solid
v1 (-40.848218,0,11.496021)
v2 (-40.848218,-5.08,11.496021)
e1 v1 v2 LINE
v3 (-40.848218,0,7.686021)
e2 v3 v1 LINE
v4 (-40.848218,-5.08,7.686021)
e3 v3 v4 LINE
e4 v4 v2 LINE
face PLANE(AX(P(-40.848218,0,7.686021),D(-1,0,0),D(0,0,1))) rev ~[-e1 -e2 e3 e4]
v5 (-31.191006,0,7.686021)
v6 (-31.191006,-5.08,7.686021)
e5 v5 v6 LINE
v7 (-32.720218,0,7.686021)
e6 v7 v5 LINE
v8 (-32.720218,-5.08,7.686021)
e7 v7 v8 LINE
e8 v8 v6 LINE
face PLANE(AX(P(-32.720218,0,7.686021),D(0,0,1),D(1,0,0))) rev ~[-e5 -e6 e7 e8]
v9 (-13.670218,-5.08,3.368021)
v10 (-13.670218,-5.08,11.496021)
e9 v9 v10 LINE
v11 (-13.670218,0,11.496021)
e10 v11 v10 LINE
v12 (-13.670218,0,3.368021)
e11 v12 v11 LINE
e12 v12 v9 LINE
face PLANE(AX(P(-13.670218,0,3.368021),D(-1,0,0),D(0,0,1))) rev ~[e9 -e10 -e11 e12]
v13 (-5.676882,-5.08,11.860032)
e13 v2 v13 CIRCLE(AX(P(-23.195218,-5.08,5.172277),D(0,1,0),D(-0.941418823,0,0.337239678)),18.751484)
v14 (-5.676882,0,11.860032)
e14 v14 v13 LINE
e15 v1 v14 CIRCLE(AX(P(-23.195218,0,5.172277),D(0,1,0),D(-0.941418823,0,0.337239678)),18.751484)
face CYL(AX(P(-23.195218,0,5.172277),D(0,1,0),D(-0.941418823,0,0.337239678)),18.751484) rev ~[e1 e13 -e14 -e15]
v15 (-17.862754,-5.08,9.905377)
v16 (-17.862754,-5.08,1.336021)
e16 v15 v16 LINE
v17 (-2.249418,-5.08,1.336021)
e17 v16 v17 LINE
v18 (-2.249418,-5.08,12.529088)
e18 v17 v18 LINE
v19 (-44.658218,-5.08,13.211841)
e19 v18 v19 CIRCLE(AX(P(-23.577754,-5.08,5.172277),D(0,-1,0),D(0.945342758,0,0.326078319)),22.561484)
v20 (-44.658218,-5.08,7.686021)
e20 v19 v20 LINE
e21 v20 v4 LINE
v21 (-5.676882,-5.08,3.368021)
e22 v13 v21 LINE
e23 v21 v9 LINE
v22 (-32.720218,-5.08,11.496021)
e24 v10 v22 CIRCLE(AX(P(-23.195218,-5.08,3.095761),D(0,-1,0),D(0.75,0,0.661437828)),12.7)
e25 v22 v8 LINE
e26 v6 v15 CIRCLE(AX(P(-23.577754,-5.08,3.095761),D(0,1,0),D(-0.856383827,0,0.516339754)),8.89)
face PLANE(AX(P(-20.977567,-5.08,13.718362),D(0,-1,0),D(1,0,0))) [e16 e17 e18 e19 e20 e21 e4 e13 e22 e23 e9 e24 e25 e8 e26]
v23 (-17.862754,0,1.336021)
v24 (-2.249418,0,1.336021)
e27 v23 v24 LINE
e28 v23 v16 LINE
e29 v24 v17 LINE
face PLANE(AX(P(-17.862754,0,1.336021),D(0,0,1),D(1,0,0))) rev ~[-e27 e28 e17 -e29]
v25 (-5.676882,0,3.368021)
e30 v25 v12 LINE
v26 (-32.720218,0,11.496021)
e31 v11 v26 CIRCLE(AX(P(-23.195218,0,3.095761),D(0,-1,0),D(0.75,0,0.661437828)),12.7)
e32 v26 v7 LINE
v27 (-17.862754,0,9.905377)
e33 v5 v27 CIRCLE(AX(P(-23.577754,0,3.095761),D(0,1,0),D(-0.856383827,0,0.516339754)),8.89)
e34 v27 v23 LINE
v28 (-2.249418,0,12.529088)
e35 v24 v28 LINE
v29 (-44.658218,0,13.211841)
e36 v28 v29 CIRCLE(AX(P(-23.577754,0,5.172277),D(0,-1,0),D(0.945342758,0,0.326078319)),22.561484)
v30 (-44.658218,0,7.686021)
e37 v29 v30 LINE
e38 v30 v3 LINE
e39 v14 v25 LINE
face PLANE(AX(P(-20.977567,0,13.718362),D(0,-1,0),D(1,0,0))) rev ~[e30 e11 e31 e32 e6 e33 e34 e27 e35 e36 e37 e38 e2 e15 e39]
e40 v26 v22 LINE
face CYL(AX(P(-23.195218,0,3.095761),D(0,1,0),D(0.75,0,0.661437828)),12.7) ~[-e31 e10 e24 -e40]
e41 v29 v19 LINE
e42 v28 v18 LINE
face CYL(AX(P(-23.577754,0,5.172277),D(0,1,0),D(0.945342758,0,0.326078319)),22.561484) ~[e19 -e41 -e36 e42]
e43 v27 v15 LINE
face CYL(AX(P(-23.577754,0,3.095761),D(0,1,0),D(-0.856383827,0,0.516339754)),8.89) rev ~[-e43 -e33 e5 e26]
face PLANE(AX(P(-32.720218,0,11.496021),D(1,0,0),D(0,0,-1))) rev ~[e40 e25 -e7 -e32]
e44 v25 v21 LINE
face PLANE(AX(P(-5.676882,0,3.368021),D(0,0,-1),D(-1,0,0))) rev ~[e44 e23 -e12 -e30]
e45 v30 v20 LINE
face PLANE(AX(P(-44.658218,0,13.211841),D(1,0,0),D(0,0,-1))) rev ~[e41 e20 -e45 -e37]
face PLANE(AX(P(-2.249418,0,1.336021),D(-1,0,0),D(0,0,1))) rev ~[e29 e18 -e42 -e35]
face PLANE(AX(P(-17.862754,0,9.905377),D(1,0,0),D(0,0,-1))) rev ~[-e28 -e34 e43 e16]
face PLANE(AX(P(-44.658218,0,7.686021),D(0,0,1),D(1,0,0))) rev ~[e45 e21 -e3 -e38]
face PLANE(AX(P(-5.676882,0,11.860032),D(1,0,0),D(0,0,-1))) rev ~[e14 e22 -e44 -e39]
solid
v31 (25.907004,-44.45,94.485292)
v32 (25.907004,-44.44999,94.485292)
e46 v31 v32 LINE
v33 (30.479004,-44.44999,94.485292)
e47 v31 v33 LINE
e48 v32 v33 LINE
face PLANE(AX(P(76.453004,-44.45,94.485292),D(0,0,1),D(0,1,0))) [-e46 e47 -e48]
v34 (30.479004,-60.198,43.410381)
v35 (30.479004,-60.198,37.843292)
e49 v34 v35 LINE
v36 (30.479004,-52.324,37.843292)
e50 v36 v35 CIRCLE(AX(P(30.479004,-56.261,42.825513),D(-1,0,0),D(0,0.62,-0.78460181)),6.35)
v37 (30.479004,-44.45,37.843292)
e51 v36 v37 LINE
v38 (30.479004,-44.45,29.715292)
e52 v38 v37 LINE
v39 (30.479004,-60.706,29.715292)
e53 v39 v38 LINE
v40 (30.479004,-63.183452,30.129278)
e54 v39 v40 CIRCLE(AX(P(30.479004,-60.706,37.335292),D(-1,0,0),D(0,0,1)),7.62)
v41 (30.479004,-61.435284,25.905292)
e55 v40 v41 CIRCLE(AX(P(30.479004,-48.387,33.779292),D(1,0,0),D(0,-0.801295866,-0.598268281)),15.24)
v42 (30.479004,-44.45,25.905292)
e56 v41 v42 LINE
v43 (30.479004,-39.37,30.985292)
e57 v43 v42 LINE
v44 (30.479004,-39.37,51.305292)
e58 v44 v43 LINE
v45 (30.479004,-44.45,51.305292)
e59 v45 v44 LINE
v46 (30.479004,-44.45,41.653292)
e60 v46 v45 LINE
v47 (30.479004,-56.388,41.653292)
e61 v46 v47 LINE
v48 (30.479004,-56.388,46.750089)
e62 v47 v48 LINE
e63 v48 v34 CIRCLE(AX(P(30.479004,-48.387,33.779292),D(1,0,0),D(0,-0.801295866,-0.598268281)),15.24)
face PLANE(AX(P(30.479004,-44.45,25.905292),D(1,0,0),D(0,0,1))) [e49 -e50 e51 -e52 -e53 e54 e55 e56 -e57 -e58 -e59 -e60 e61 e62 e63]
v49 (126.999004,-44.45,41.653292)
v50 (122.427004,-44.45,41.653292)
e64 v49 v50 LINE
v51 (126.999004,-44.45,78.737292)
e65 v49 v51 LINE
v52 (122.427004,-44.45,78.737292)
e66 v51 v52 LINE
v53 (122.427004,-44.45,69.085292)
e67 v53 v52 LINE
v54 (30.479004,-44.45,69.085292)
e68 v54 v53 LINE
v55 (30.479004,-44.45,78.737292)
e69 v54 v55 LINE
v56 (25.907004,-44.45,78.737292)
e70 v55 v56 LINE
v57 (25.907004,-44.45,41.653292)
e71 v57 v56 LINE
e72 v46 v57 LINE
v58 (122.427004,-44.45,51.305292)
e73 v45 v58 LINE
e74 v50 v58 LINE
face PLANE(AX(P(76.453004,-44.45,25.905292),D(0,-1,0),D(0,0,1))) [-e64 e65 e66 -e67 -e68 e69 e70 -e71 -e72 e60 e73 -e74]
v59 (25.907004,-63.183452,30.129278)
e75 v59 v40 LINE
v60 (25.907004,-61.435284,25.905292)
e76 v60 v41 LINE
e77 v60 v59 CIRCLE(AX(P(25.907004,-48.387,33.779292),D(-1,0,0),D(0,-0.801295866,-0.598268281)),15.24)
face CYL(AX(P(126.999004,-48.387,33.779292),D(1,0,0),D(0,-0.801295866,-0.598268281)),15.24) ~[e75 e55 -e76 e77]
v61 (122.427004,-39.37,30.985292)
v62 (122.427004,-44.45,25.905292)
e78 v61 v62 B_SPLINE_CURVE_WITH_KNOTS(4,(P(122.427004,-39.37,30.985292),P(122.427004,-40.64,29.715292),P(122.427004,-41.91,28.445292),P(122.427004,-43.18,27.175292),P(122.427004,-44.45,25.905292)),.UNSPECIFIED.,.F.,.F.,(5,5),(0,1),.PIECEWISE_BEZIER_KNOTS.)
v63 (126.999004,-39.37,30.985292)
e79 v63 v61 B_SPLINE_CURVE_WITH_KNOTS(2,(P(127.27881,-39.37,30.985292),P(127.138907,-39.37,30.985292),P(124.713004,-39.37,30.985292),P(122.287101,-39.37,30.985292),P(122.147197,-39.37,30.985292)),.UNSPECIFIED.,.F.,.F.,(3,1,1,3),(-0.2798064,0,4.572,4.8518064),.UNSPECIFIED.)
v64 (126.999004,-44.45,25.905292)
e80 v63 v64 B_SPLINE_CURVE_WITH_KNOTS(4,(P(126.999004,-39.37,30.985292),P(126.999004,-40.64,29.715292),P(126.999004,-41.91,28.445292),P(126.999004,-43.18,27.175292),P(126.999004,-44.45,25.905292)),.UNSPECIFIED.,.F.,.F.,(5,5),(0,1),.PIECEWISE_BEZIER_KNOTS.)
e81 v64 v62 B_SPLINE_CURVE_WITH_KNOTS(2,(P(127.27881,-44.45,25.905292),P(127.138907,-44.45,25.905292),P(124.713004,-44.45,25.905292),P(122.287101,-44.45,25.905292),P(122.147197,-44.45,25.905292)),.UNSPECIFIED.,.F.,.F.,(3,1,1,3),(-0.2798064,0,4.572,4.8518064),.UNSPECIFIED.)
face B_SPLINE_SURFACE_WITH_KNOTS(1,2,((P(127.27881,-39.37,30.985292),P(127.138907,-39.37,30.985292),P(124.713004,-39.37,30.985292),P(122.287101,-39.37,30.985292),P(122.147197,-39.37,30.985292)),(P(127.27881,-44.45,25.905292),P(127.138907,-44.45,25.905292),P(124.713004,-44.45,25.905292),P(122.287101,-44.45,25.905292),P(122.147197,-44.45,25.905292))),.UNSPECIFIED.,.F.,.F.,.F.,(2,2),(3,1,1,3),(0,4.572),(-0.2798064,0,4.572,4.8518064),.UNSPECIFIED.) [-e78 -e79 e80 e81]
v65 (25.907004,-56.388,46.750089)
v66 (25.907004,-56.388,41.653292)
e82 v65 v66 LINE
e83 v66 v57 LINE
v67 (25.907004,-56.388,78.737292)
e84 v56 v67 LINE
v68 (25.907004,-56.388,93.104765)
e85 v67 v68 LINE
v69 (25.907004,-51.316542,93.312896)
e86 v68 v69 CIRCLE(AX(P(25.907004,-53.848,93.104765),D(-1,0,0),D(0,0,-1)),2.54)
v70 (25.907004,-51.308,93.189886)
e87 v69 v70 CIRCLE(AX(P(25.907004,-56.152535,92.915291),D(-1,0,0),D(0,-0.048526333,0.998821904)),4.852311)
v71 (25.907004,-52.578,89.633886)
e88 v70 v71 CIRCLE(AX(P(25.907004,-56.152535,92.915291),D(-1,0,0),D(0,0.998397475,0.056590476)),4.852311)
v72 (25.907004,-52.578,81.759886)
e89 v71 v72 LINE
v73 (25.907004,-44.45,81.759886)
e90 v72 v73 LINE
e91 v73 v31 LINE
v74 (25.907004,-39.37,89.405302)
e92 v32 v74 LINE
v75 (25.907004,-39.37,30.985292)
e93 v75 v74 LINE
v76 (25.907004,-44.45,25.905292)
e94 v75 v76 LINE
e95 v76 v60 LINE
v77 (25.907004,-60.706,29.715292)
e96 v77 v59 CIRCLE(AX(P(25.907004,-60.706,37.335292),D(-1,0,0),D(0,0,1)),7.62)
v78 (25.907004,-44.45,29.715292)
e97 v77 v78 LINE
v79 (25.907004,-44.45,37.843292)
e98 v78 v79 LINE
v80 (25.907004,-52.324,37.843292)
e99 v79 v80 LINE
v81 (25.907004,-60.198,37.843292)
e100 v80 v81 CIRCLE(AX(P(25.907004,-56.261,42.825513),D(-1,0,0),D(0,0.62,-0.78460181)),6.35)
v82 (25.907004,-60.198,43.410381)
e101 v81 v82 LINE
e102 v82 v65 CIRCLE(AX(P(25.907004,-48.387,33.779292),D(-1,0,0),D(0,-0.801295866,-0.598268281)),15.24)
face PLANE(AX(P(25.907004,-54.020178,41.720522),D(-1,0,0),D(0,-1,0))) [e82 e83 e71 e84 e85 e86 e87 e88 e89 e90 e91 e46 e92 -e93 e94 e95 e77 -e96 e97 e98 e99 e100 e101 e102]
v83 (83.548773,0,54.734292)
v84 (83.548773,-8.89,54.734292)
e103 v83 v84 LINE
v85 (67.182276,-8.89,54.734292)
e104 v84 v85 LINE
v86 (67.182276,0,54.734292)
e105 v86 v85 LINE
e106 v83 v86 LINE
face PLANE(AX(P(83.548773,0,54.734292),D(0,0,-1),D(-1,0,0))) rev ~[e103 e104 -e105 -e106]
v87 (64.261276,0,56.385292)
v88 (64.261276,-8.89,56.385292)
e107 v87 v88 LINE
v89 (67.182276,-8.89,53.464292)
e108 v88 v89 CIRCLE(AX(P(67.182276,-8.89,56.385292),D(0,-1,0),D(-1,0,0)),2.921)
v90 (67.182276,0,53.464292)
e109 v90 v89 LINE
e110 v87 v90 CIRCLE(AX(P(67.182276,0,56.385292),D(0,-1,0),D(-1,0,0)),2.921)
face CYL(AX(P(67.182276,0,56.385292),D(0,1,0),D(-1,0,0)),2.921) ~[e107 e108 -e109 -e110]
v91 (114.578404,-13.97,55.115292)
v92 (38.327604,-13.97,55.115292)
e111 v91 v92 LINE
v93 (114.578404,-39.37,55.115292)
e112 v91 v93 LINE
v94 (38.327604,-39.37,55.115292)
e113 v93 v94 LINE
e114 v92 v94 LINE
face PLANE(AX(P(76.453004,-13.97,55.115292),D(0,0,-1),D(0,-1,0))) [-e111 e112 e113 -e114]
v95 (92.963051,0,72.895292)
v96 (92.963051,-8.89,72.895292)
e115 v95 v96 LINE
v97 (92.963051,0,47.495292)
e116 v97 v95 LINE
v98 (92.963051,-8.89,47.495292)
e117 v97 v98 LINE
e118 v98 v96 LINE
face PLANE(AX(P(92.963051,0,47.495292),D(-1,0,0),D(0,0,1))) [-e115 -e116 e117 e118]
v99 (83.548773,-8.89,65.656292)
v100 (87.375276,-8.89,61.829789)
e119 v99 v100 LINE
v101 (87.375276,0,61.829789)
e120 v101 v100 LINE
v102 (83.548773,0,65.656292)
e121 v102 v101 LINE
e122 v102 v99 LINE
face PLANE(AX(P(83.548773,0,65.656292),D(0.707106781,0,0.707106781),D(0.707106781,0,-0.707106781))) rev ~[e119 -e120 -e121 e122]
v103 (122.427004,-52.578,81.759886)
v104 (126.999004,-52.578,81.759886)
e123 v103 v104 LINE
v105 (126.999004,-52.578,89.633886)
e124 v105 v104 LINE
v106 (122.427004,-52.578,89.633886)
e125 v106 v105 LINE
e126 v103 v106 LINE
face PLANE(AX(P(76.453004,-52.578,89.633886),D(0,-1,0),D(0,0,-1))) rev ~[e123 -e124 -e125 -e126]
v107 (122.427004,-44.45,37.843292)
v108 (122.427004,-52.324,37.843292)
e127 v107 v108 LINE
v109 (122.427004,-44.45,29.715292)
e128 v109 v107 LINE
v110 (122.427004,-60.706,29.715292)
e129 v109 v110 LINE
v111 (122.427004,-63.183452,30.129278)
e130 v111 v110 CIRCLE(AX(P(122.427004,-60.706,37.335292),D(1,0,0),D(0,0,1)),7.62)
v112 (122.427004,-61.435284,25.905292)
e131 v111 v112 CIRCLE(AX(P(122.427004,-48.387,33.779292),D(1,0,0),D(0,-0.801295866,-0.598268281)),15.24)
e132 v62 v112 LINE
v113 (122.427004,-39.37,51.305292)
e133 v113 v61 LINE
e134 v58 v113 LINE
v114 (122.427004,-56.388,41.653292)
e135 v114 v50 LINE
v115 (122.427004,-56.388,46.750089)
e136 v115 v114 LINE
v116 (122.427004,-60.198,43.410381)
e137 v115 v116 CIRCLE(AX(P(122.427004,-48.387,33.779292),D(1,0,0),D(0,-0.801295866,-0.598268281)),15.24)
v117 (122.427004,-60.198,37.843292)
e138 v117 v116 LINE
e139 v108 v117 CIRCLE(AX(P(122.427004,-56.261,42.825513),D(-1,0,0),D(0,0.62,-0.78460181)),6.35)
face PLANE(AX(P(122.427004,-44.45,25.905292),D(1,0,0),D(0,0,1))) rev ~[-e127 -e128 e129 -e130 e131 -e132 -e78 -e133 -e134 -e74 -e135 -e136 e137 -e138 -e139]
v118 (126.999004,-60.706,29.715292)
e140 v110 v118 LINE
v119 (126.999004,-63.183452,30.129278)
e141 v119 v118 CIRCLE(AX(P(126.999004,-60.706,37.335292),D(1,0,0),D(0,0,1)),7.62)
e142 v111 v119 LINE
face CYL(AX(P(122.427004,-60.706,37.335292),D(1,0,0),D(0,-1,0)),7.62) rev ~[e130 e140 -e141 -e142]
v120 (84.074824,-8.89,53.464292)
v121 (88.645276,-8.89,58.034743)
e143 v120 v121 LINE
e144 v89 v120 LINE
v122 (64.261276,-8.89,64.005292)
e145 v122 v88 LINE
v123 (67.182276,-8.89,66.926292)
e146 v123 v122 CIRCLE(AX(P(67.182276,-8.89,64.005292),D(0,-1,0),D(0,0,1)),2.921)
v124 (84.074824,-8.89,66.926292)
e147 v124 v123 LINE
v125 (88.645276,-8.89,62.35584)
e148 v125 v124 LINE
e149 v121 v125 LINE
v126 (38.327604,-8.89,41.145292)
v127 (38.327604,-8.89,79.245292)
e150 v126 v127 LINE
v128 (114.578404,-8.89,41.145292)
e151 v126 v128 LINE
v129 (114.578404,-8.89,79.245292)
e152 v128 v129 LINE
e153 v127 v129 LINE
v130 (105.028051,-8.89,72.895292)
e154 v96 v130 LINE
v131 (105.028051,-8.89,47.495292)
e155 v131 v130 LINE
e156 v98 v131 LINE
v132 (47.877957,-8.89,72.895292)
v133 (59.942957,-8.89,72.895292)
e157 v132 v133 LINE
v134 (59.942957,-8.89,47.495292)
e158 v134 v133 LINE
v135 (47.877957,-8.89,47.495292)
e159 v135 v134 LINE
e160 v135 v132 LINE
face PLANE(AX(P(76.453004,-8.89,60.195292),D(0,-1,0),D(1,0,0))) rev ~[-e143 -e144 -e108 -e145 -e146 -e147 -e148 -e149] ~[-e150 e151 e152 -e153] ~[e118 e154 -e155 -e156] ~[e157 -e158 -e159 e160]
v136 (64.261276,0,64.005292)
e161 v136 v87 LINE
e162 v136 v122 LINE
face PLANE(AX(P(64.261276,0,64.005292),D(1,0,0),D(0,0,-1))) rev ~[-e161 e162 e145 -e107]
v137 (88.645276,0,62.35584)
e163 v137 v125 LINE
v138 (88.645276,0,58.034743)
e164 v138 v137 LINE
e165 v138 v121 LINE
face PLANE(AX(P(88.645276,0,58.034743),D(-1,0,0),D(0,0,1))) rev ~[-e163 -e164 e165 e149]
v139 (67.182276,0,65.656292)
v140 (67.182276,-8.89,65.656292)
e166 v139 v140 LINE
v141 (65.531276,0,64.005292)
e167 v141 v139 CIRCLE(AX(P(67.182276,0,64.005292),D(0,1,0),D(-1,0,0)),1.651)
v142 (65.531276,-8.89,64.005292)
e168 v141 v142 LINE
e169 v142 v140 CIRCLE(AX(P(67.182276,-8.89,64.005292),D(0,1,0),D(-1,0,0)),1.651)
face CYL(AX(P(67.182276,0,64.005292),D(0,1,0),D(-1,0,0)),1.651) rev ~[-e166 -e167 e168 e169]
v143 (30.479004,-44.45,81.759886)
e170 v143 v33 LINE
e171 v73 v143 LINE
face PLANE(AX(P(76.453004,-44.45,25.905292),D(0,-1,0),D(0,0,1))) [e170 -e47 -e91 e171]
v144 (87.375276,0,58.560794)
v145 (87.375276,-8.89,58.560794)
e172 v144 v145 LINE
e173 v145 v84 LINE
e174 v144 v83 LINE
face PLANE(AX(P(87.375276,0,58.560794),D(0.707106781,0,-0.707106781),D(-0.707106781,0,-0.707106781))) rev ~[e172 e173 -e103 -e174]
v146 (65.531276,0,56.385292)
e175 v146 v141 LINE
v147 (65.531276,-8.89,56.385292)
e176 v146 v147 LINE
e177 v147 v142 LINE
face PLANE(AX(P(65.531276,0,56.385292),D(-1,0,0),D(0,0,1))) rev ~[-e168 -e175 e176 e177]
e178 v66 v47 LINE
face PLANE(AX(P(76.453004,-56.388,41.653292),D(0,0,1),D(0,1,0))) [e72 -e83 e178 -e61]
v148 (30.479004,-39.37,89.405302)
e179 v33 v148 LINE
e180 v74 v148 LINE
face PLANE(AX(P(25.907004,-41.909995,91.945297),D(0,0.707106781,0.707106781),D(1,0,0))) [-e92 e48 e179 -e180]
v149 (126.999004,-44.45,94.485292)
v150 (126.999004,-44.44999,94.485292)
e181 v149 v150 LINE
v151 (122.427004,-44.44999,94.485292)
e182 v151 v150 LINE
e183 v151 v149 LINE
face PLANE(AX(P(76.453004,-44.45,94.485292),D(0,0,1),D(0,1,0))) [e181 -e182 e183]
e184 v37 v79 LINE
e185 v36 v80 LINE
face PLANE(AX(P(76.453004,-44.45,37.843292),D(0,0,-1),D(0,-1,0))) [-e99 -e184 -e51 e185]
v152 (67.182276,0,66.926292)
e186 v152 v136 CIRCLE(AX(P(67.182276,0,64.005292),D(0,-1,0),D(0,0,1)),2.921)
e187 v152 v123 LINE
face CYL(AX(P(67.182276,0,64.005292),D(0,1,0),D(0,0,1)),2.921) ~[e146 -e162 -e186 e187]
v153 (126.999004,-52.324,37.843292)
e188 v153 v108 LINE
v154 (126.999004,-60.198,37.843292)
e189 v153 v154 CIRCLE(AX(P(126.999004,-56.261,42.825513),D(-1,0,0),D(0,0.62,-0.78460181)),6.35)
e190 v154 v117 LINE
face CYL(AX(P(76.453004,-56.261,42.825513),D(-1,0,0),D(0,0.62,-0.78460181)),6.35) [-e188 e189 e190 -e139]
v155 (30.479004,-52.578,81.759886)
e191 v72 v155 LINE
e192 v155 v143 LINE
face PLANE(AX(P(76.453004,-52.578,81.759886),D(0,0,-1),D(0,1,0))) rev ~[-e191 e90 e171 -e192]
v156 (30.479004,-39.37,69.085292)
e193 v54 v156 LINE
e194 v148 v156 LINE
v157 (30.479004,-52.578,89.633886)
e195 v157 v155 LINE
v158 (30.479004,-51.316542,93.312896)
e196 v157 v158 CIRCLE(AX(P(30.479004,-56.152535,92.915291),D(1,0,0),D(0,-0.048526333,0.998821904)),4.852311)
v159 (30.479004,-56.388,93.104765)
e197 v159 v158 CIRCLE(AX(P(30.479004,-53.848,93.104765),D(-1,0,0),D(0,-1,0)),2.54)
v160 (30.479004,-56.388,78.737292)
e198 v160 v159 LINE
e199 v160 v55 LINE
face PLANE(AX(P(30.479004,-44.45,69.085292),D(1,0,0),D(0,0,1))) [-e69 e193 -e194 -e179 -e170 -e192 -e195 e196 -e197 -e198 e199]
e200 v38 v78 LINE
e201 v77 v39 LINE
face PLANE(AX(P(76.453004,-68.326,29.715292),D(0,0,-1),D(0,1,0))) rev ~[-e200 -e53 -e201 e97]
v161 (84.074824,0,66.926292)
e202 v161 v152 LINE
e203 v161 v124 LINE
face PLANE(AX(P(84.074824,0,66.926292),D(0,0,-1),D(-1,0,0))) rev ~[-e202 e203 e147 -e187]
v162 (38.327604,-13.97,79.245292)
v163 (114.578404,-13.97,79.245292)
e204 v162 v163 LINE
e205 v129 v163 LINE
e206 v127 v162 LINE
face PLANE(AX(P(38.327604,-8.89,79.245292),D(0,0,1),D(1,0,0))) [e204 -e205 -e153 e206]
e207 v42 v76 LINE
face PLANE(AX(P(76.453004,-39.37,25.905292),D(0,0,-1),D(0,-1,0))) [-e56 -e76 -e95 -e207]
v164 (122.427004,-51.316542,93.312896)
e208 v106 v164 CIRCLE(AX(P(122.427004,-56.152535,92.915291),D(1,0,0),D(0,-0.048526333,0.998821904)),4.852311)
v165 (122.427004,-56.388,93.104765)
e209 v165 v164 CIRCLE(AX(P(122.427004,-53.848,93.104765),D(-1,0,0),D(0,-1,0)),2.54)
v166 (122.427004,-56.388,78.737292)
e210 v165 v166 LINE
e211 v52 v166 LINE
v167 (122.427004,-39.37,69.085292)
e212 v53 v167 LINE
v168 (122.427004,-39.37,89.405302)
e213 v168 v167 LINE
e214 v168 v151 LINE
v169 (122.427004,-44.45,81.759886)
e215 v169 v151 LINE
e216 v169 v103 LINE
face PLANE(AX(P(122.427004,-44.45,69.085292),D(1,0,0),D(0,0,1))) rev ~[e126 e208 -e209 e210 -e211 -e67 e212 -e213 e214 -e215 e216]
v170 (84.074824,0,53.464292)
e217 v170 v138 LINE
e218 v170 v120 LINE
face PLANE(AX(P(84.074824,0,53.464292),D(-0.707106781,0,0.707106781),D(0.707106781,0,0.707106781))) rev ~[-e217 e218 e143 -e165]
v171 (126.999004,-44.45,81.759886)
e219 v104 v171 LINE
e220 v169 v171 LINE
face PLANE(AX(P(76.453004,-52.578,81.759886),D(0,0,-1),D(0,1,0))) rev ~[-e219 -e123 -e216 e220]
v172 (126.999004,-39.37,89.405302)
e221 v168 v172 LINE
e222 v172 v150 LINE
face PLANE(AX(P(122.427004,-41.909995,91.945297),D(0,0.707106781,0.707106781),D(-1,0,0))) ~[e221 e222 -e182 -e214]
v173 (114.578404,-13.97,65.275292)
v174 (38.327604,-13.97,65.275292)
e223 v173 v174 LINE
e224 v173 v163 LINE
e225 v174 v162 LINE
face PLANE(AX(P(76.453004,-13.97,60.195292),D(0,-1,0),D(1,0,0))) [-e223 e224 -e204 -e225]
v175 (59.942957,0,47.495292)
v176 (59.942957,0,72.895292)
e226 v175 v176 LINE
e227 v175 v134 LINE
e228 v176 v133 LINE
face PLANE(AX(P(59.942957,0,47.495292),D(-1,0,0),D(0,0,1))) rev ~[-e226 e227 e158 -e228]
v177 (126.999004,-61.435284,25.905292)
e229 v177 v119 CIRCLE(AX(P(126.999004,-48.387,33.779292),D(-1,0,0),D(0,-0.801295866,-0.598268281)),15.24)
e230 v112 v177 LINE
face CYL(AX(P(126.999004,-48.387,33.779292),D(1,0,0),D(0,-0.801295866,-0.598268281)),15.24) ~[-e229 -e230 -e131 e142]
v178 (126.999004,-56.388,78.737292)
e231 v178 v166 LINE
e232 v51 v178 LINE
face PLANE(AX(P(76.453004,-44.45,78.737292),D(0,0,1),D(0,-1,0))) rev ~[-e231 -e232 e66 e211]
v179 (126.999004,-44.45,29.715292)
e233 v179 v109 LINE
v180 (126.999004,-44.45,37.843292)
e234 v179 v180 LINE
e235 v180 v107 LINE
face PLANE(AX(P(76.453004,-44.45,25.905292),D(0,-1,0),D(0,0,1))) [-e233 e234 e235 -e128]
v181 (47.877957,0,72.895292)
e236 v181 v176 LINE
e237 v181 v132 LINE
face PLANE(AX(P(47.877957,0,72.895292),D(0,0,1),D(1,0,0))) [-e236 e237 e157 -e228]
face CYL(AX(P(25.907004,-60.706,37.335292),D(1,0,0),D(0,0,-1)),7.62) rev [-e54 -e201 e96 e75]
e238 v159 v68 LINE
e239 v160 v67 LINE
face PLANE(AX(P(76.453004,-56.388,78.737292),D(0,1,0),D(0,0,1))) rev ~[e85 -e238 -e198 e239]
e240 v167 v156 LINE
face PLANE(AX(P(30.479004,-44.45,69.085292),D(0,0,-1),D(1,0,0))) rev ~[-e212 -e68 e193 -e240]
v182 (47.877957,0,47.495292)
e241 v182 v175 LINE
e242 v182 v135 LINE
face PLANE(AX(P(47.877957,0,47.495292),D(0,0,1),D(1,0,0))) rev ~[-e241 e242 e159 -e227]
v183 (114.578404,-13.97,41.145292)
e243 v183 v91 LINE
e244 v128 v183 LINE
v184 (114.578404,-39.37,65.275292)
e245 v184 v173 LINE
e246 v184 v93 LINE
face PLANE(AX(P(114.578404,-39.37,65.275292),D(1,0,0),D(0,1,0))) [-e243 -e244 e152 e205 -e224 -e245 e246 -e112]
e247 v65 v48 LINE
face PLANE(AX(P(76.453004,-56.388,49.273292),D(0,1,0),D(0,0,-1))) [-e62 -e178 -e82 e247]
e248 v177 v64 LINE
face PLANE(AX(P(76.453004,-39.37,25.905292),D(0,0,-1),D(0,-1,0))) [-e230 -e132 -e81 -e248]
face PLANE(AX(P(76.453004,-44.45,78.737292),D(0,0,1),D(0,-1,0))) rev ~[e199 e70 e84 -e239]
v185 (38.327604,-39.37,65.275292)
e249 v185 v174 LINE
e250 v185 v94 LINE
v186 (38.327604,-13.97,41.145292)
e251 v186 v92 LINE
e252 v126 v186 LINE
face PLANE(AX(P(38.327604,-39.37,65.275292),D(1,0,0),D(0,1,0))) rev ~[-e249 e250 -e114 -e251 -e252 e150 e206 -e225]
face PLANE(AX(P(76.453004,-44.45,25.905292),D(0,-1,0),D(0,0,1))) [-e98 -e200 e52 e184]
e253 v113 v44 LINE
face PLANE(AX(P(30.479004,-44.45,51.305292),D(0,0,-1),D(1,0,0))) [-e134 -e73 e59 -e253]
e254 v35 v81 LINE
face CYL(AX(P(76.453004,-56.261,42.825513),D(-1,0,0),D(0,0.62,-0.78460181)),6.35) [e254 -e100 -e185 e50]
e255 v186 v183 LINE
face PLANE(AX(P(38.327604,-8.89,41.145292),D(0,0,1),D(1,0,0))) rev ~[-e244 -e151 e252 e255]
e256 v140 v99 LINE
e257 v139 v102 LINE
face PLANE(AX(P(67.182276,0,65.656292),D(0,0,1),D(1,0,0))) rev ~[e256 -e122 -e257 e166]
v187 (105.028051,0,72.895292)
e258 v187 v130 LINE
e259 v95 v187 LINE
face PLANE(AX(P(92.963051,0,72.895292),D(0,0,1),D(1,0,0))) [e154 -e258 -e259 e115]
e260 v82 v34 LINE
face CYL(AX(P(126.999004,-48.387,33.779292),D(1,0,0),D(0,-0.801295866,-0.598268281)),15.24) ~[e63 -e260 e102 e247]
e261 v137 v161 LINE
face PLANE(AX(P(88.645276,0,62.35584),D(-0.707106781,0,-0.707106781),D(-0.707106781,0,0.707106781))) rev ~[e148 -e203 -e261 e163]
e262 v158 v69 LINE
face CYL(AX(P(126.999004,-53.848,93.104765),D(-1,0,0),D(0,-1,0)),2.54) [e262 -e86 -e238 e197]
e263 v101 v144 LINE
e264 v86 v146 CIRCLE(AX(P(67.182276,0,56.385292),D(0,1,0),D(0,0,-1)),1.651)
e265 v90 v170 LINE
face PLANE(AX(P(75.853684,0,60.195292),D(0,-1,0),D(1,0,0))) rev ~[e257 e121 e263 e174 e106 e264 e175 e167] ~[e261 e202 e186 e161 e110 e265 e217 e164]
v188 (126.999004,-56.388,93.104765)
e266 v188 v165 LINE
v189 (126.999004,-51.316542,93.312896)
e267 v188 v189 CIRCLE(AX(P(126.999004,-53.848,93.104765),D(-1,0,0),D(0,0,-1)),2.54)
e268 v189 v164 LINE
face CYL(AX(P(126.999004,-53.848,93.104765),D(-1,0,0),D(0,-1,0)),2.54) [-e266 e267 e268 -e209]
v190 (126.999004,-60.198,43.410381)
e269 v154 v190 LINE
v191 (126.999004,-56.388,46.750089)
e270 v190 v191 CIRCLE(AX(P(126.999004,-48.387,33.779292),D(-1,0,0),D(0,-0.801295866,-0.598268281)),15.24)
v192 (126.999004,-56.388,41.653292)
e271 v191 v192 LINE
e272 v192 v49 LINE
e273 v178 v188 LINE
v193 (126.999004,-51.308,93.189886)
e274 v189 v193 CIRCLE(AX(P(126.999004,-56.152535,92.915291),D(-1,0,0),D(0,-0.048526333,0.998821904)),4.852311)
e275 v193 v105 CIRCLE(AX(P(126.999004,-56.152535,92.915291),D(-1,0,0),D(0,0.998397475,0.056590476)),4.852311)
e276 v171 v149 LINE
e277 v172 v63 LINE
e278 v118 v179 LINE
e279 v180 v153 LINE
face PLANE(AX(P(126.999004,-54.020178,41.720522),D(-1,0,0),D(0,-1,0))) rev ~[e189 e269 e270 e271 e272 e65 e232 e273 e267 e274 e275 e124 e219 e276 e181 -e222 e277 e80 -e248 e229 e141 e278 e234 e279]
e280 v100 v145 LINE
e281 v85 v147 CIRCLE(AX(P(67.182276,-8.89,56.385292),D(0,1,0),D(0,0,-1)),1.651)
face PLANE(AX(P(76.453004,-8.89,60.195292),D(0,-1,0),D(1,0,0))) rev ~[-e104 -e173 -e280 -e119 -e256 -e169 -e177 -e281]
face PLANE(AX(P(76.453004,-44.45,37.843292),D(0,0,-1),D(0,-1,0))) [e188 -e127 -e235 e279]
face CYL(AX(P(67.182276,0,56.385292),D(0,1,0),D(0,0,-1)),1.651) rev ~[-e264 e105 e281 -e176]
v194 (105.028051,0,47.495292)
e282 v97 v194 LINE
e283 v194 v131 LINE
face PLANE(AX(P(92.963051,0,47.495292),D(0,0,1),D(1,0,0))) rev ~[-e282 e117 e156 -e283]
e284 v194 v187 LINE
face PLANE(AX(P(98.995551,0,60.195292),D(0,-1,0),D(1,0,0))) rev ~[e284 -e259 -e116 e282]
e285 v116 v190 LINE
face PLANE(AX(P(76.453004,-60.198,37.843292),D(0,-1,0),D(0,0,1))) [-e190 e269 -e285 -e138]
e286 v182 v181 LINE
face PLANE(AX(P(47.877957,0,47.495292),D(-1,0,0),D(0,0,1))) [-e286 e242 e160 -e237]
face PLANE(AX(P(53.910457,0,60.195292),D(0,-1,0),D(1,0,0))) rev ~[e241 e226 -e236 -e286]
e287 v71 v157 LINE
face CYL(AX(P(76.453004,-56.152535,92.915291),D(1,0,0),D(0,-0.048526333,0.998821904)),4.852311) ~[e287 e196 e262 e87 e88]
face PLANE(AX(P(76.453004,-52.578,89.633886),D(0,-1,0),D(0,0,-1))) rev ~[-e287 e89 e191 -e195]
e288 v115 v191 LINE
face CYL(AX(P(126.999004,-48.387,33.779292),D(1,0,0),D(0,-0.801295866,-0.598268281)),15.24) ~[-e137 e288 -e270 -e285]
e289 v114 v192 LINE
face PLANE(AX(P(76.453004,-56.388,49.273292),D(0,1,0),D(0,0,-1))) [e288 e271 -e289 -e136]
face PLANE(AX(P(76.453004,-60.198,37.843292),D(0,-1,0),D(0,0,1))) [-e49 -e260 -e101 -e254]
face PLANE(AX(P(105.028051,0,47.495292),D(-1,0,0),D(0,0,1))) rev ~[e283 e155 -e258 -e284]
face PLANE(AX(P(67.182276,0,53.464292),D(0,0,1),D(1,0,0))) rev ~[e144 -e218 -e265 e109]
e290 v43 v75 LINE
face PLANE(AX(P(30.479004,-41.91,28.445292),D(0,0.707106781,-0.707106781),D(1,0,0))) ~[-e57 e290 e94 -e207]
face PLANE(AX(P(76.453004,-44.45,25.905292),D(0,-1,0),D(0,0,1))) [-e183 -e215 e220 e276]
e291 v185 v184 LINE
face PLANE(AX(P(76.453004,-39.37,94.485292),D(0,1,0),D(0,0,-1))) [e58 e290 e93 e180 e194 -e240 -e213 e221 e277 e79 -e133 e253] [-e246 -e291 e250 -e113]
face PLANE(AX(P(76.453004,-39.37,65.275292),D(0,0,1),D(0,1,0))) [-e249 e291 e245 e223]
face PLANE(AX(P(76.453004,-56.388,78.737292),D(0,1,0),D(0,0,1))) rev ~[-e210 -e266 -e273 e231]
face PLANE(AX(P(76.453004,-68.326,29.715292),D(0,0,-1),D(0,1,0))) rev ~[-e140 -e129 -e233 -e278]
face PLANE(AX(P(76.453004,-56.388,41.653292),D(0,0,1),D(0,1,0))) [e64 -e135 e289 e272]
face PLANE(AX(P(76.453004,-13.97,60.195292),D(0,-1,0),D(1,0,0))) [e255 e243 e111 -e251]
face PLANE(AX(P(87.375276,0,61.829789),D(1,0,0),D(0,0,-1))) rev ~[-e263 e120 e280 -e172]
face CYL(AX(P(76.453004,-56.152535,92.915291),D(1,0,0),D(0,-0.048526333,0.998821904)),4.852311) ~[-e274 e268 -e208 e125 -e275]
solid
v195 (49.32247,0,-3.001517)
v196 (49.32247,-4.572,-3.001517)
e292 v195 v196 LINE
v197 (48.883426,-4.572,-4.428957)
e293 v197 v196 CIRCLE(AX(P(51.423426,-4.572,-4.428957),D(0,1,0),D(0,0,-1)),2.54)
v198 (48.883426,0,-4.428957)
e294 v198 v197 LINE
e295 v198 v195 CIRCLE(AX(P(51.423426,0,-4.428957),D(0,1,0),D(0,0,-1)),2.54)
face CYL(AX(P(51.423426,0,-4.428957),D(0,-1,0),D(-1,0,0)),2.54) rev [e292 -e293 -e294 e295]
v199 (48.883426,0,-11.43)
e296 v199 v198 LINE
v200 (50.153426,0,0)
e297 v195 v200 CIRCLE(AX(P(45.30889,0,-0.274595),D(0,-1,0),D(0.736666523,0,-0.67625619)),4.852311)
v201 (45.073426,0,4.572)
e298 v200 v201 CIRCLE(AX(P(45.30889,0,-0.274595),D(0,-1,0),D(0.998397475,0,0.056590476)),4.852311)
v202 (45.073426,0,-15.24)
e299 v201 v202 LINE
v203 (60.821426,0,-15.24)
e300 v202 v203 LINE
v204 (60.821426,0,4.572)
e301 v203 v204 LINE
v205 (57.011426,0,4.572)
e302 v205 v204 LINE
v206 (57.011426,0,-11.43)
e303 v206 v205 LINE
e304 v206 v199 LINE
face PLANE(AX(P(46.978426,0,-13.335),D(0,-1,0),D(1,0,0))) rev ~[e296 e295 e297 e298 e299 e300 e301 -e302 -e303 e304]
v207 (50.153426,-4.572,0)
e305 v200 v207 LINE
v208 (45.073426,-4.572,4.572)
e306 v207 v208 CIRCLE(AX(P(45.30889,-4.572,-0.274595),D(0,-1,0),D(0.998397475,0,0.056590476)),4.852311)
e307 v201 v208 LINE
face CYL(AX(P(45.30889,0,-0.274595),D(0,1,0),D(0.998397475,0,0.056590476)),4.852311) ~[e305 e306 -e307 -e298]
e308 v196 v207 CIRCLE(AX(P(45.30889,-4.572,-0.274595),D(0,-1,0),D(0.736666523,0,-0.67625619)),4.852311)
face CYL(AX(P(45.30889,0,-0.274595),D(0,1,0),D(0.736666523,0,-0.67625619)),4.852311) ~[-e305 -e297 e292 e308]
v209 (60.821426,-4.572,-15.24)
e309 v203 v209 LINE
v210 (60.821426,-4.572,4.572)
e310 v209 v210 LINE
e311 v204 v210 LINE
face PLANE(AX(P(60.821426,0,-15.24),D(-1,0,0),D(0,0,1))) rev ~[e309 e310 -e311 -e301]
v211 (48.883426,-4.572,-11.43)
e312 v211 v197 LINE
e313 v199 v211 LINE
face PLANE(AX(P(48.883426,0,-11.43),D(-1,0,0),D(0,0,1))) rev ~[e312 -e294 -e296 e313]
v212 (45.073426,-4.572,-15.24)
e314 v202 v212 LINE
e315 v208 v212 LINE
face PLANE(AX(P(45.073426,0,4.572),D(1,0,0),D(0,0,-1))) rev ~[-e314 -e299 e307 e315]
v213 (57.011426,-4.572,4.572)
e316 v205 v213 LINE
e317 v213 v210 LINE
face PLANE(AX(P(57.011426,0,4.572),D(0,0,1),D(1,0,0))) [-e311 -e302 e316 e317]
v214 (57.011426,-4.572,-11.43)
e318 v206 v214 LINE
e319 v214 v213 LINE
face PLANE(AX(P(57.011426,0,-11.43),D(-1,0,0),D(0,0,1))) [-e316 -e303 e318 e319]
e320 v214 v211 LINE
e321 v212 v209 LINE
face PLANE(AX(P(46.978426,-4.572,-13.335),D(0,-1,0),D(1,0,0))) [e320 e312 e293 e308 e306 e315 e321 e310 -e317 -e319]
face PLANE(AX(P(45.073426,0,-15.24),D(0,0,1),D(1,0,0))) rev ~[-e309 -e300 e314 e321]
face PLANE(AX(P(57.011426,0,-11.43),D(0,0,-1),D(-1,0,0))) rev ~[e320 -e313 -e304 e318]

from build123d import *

# Parameters (mm, degrees)
F1_DEPTH  = 5.08
F2_W      = 3.81
F2_H      = 3.81
F2_H_2    = 16.002
F3_DEPTH  = 4.572
F4_R      = 2.54
F6_DEPTH  = 8.89
F5_W      = 12.065
F5_H      = 25.4
F7_W      = 76.2508
F7_H      = 38.1
F8_DEPTH  = 5.08
F11_DEPTH = 50.546
F12_W     = 12.4206
F12_H     = 25.4
F13_DEPTH = 25.4
F14_W     = 91.948
F14_H     = 25.4
F15_DEPTH = 25.4
F16_W     = 8.128
F16_H     = 3.0225940797
F16_W_2   = 3.81
F17_DEPTH = 50.546
F18_R     = 2.54
F19_SIZE  = 5.07999
F20_SIZE  = 5.07999
F22_DEPTH = 25.4
F23_SIZE  = 5.08
F24_SIZE  = 5.08
F25_DEPTH = 57.15
F26_R     = 7.62
F27_R     = 7.62
F29_DEPTH = 101.092


# Not quite as in the source:
# - a fillet or chamfer is up to 0.001 mm smaller than in the source, because OpenCascade refuses the exact size
# - a feature names something its author has since deleted; it is built from what else it names


with BuildPart() as f1:
    # F0 (on Front) → F1 (new body)
    with BuildSketch(Plane.XZ):
        with BuildLine():
            Line((-13.6702175791, 3.3680211509), (-13.6702175791, 11.4960211509))
            ThreePointArc((-13.6702175791, 11.4960211509), (-23.1952175791, 15.7957607383), (-32.7202175791, 11.4960211509))
            Line((-32.7202175791, 11.4960211509), (-32.7202175791, 7.6860211509))
            Line((-32.7202175791, 7.6860211509), (-31.1910058421, 7.6860211509))
            ThreePointArc((-31.1910058421, 7.6860211509), (-25.0379678472, 11.8650180854), (-17.8627536235, 9.9053771004))
            Line((-17.8627536235, 9.9053771004), (-17.8627536235, 1.3360211509))
            Line((-17.8627536235, 1.3360211509), (-2.2494181128, 1.3360211509))
            Line((-2.2494181128, 1.3360211509), (-2.2494181128, 12.5290875188))
            ThreePointArc((-2.2494181128, 12.5290875188), (-23.214575579, 27.7308374634), (-44.6582175791, 13.2118413985))
            Line((-44.6582175791, 13.2118413985), (-44.6582175791, 7.6860211509))
            Line((-44.6582175791, 7.6860211509), (-40.8482175791, 7.6860211509))
            Line((-40.8482175791, 7.6860211509), (-40.8482175791, 11.4960211509))
            ThreePointArc((-40.8482175791, 11.4960211509), (-23.3892785102, 23.9227565337), (-5.6768820684, 11.8600322155))
            Line((-5.6768820684, 11.8600322155), (-5.6768820684, 3.3680211509))
            Line((-5.6768820684, 3.3680211509), (-13.6702175791, 3.3680211509))
        make_face()
    extrude(amount=F1_DEPTH)


with BuildPart() as f3:
    # F2 (on Front) → F3 (new body)
    with BuildSketch(Plane.XZ):
        with Locations((46.9784255706, -13.335)):
            Rectangle(F2_W, F2_H)
        Polygon((60.8214255706, -15.24), (60.8214255706, -11.43), (57.0114255706, -11.43), (48.8834255706, -11.43), (48.8834255706, -15.24), align=None)
        with BuildLine():
            Line((45.0734255706, -11.43), (48.8834255706, -11.43))
            Line((48.8834255706, -11.43), (48.8834255706, -3.556))
            ThreePointArc((48.8834255706, -3.556), (49.8785151524, -1.9066034221), (50.1534255706, 0))
            ThreePointArc((50.1534255706, 0), (48.5549154183, 3.3320998308), (45.0734255706, 4.572))
            Line((45.0734255706, 4.572), (45.0734255706, -11.43))
        make_face()
        with Locations((58.9164255706, -3.429)):
            Rectangle(F2_W, F2_H_2)
    extrude(amount=F3_DEPTH)

    # F4
    f4_edges = [f3.edges().sort_by_distance(p)[0] for p in [
        (48.883426, -2.286, -3.556),
    ]]
    fillet(f4_edges, radius=F4_R)


with BuildPart() as f6:
    # F5 (on Front) → F6 (new body)
    with BuildSketch(Plane.XZ):
        with BuildLine():
            Line((64.2612756615, 64.0052915247), (64.2612756615, 56.3852915247))
            ThreePointArc((64.2612756615, 56.3852915247), (65.1168167537, 54.3198326169), (67.1822756615, 53.4642915247))
            Line((67.1822756615, 53.4642915247), (84.0748242118, 53.4642915247))
            Line((84.0748242118, 53.4642915247), (88.6452756615, 58.0347429745))
            Line((88.6452756615, 58.0347429745), (88.6452756615, 62.3558400749))
            Line((88.6452756615, 62.3558400749), (84.0748242118, 66.9262915247))
            Line((84.0748242118, 66.9262915247), (67.1822756615, 66.9262915247))
            ThreePointArc((67.1822756615, 66.9262915247), (65.1168167537, 66.0707504326), (64.2612756615, 64.0052915247))
        make_face()
        with BuildLine():
            Line((83.5487729875, 54.7342915247), (67.1822756615, 54.7342915247))
            ThreePointArc((67.1822756615, 54.7342915247), (66.0148423658, 55.217858229), (65.5312756615, 56.3852915247))
            Line((65.5312756615, 56.3852915247), (65.5312756615, 64.0052915247))
            ThreePointArc((65.5312756615, 64.0052915247), (66.0148423658, 65.1727248204), (67.1822756615, 65.6562915247))
            Line((67.1822756615, 65.6562915247), (83.5487729875, 65.6562915247))
            Line((83.5487729875, 65.6562915247), (87.3752756615, 61.8297888507))
            Line((87.3752756615, 61.8297888507), (87.3752756615, 58.5607941987))
            Line((87.3752756615, 58.5607941987), (83.5487729875, 54.7342915247))
        make_face(mode=Mode.SUBTRACT)
    extrude(amount=F6_DEPTH)



with BuildPart() as f6b:
    # F5 (on Front) → F6, piece 2 (new body)
    with BuildSketch(Plane.XZ):
        with Locations((53.9104570084, 60.1952915247)):
            Rectangle(F5_W, F5_H)
    extrude(amount=F6_DEPTH)


with BuildPart() as f6c:
    # F5 (on Front) → F6, piece 3 (new body)
    with BuildSketch(Plane.XZ):
        with Locations((98.9955507601, 60.1952915247)):
            Rectangle(F5_W, F5_H)
    extrude(amount=F6_DEPTH)


with BuildPart() as f6_1:
    add(f6.part)

    add(f6b.part)  # F8 merges F6b

    add(f6c.part)  # F8 merges F6c
    # F7 (on face) → F8 (join)
    with BuildSketch(Plane.XZ.offset(8.89)):
        with Locations((76.4530038843, 60.1952915247)):
            Rectangle(F7_W, F7_H)
        Polygon((59.9429570084, 47.4952915247), (47.8779570084, 47.4952915247), (47.8779570084, 72.8952915247), (59.9429570084, 72.8952915247), (59.9429570084, 67.5330780989), (76.4530038843, 60.1952915247), (59.9429570084, 52.8575049505), align=None, mode=Mode.SUBTRACT)
        Polygon((59.9429570084, 72.8952915247), (47.8779570084, 72.8952915247), (59.9429570084, 67.5330780989), align=None)
        Polygon((59.9429570084, 67.5330780989), (59.9429570084, 52.8575049505), (76.4530038843, 60.1952915247), align=None)
        Polygon((47.8779570084, 72.8952915247), (47.8779570084, 47.4952915247), (59.9429570084, 52.8575049505), (59.9429570084, 67.5330780989), align=None)
        Polygon((59.9429570084, 52.8575049505), (47.8779570084, 47.4952915247), (59.9429570084, 47.4952915247), align=None)
    extrude(amount=F8_DEPTH)

    # F10 (on offset) → F11 (join, symmetric)
    with BuildSketch(Plane(origin=(76.4530038843, 0, 0), x_dir=(0, -1, 0), z_dir=(-1, 0, 0))):
        Polygon((39.37, 65.2752915247), (13.97, 65.2752915247), (13.97, 60.1952915247), (44.45, 60.1952915247), (44.45, 94.4852915247), (39.37, 94.4852915247), align=None)
        Polygon((44.45, 60.1952915247), (13.97, 60.1952915247), (13.97, 55.1152915247), (39.37, 55.1152915247), (39.37, 25.9052915247), (44.45, 25.9052915247), align=None)
    extrude(amount=F11_DEPTH, both=True)

    # F12 (on face) → F13 (cut)
    with BuildSketch(Plane.XY.offset(65.2752915247)):
        with Locations((32.1173038843, -26.67)):
            Rectangle(F12_W, F12_H)
        with Locations((120.7887038843, -26.67)):
            Rectangle(F12_W, F12_H)
    extrude(amount=-F13_DEPTH, mode=Mode.SUBTRACT)

    # F14 (on face) → F15 (cut)
    with BuildSketch(Plane.XZ.offset(44.45)):
        with Locations((76.4530038843, 81.7852915247)):
            Rectangle(F14_W, F14_H)
        with Locations((76.4530038843, 38.6052915247)):
            Rectangle(F14_W, F14_H)
    extrude(amount=-F15_DEPTH, mode=Mode.SUBTRACT)

    # F16 (on offset) → F17 (join, symmetric)
    with BuildSketch(Plane(origin=(76.4530038843, 0, 0), x_dir=(0, -1, 0), z_dir=(-1, 0, 0))):
        with Locations((48.514, 80.2485885645)):
            Rectangle(F16_W, F16_H)
        Polygon((68.326, 29.7152915247), (44.45, 29.7152915247), (44.45, 25.9052915247), (72.136, 25.9052915247), (72.136, 49.2732915247), (68.326, 49.2732915247), align=None)
        with BuildLine():
            Line((56.388, 41.6532915247), (44.45, 41.6532915247))
            Line((44.45, 41.6532915247), (44.45, 37.8432915247))
            Line((44.45, 37.8432915247), (52.324, 37.8432915247))
            ThreePointArc((52.324, 37.8432915247), (56.261, 36.4755130172), (60.198, 37.8432915247))
            Line((60.198, 37.8432915247), (60.198, 49.2732915247))
            Line((60.198, 49.2732915247), (56.388, 49.2732915247))
            Line((56.388, 49.2732915247), (56.388, 41.6532915247))
        make_face()
        with Locations((54.483, 80.2485885645)):
            Rectangle(F16_W_2, F16_H)
        with BuildLine():
            Line((52.578, 89.6338856044), (52.578, 81.7598856044))
            Line((52.578, 81.7598856044), (56.388, 81.7598856044))
            Line((56.388, 81.7598856044), (56.388, 97.7618856044))
            ThreePointArc((56.388, 97.7618856044), (52.9065101523, 96.5219854351), (51.308, 93.1898856044))
            ThreePointArc((51.308, 93.1898856044), (51.5829104182, 91.2832821823), (52.578, 89.6338856044))
        make_face()
    extrude(amount=F17_DEPTH, both=True)

    # F18
    f18_edges = [f6_1.edges().sort_by_distance(p)[0] for p in [
        (76.453004, -56.388, 97.761886),
    ]]
    fillet(f18_edges, radius=F18_R)

    # F19 (size 5.08 in the source; OpenCascade refuses exactly that, so slightly less here)
    f19_edges = [f6_1.edges().sort_by_distance(p)[0] for p in [
        (28.193004, -39.37, 94.485292),
    ]]
    chamfer(f19_edges, length=F19_SIZE)

    # F20 (size 5.08 in the source; OpenCascade refuses exactly that, so slightly less here)
    f20_edges = [f6_1.edges().sort_by_distance(p)[0] for p in [
        (124.713004, -39.37, 94.485292),
    ]]
    chamfer(f20_edges, length=F20_SIZE)

    # F21 (on face) → F22 (cut)
    with BuildSketch(Plane(origin=(0, 0, 78.7372915247), x_dir=(1, 0, 0), z_dir=(0, 0, -1))):
        Polygon((30.4790038843, 56.388), (30.4790038843, 44.45), (122.4270038843, 44.45), (122.4270038843, 72.136), (30.4790038843, 72.136), align=None)
    extrude(amount=-F22_DEPTH, mode=Mode.SUBTRACT)

    # F23
    f23_edges = [f6_1.edges().sort_by_distance(p)[0] for p in [
        (28.193004, -39.37, 25.905292),
    ]]
    chamfer(f23_edges, length=F23_SIZE)

    # F24
    f24_edges = [f6_1.edges().sort_by_distance(p)[0] for p in [
        (124.713004, -39.37, 25.905292),
    ]]
    chamfer(f24_edges, length=F24_SIZE)

    # F21 (on face) → F25 (cut, symmetric)
    with BuildSketch(Plane(origin=(0, 0, 78.7372915247), x_dir=(1, 0, 0), z_dir=(0, 0, -1))):
        Polygon((30.4790038843, 56.388), (30.4790038843, 44.45), (122.4270038843, 44.45), (122.4270038843, 72.136), (30.4790038843, 72.136), align=None)
    extrude(amount=F25_DEPTH, both=True, mode=Mode.SUBTRACT)

    # F26
    f26_edges = [f6_1.edges().sort_by_distance(p)[0] for p in [
        (124.713004, -72.136, 25.905292),
        (124.713004, -68.326, 29.715292),
    ]]
    fillet(f26_edges, radius=F26_R)

    # F27
    f27_edges = [f6_1.edges().sort_by_distance(p)[0] for p in [
        (28.193004, -72.136, 25.905292),
        (28.193004, -68.326, 29.715292),
    ]]
    fillet(f27_edges, radius=F27_R)

    # F28 (on face) → F29 (cut, through all)
    with BuildSketch(Plane.YZ.offset(126.9990038843)):
        with BuildLine():
            ThreePointArc((-60.598748991, 24.6616829248), (-63.0615335267, 37.892157408), (-54.0813514617, 47.9154848394))
            Line((-54.0813514617, 47.9154848394), (-60.1272594347, 63.0867996139))
            ThreePointArc((-60.1272594347, 63.0867996139), (-78.4719237933, 43.3532709658), (-74.9058635737, 16.6470530035))
            Line((-74.9058635737, 16.6470530035), (-60.598748991, 24.6616829248))
        make_face()
    extrude(amount=-F29_DEPTH, mode=Mode.SUBTRACT)


solid = Compound([f1.part, f3.part, f6_1.part])
